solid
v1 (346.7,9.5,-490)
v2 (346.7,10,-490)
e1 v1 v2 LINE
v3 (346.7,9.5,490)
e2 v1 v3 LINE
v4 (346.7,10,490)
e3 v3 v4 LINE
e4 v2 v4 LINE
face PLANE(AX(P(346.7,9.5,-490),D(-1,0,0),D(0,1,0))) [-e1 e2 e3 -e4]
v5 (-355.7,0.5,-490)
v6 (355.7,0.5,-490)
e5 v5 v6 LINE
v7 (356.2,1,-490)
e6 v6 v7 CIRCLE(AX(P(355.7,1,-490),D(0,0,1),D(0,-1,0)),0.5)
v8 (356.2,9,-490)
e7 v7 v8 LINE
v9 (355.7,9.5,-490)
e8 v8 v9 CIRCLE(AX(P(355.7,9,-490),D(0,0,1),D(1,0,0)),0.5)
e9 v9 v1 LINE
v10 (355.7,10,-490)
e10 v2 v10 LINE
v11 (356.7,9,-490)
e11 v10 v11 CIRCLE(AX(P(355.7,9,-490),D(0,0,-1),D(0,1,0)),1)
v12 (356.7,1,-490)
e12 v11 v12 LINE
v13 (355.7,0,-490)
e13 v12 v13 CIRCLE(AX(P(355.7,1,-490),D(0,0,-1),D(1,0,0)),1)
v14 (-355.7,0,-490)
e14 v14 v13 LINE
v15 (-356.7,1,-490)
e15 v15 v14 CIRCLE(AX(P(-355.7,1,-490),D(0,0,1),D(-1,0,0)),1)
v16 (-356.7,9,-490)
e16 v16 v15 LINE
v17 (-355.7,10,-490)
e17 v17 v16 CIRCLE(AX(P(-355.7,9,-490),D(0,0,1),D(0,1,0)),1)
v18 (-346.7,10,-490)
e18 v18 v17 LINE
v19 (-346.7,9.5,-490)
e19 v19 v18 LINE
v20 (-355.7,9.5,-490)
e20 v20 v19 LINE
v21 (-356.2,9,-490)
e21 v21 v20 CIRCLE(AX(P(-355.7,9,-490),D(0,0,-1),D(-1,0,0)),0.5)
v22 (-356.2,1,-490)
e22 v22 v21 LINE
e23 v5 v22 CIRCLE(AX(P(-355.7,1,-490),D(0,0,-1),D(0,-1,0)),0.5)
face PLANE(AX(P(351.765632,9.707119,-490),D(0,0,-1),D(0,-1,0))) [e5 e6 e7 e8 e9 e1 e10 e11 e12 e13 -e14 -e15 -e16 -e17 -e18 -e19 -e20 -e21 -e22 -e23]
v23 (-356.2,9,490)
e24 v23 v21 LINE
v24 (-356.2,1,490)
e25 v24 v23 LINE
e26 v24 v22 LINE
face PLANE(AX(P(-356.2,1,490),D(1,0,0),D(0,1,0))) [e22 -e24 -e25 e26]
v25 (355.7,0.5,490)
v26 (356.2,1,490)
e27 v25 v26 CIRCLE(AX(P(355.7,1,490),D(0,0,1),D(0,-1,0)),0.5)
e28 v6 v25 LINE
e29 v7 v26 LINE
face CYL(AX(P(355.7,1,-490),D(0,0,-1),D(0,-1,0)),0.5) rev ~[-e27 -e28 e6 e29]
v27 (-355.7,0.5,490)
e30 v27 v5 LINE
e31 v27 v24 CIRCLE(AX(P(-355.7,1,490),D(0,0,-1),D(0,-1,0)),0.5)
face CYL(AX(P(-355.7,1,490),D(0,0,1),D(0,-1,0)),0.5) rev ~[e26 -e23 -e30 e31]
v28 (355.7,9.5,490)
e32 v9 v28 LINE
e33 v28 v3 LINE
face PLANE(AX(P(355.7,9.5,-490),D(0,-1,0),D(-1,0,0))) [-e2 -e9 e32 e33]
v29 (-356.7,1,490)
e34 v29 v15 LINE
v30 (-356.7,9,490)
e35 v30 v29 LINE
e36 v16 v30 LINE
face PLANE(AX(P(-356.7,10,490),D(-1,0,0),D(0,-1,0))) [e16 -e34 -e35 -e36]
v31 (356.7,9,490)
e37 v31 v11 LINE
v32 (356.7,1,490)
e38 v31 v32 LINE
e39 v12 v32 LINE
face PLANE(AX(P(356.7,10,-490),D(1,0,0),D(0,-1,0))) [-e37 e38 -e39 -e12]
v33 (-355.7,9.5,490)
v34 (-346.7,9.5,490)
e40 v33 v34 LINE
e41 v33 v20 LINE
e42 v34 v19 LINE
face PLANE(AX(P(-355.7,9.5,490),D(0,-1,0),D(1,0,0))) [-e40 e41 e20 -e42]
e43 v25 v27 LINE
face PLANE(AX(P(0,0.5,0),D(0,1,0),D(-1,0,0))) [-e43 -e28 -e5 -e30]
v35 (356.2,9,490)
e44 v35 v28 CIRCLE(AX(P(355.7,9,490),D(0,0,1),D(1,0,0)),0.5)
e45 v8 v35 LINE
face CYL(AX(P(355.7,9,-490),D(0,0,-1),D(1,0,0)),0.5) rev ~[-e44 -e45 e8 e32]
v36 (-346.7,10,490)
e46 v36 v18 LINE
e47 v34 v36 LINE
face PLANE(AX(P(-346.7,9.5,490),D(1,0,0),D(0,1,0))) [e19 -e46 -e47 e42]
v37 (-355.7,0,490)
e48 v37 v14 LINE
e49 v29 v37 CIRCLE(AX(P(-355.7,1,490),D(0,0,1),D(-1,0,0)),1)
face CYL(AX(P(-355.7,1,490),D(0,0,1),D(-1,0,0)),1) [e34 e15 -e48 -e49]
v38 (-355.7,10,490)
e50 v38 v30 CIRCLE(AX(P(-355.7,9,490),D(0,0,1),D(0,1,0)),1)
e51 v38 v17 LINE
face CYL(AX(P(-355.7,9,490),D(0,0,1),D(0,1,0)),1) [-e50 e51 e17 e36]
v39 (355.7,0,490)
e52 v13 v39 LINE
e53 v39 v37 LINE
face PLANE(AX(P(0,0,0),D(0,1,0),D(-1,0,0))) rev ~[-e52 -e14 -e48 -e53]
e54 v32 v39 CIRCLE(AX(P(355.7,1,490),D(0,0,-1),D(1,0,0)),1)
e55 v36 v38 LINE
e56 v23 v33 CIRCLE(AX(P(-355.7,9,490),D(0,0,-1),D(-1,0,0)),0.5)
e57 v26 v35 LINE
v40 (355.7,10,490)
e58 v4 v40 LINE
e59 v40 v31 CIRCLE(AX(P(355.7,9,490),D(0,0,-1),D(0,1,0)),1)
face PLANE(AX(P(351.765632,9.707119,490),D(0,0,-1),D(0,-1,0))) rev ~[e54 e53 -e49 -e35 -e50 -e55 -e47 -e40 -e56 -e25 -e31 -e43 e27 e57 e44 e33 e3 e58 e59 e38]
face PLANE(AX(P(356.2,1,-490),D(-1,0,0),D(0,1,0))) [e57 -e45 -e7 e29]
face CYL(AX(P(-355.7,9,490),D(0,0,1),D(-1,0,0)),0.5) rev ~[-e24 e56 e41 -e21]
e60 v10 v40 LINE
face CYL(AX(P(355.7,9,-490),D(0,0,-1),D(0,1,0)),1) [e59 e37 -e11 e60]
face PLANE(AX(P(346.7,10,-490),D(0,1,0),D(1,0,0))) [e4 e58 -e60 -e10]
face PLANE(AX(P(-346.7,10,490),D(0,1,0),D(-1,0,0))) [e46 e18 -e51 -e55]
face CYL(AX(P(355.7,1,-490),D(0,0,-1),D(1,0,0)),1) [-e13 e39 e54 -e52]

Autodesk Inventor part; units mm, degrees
ref_plane "YZ Plane" through (0, 0, 0) normal (1, 0, 0) x (0, 1, 0)
ref_plane "XZ Plane" through (0, 0, 0) normal (0, 1, 0) x (-1, 0, 0)
ref_plane "XY Plane" through (0, 0, 0) normal (0, 0, 1) x (1, 0, 0)
sketch "Sketch6" plane through (0, 0, 0) normal (0, 1, 0) x (-1, 0, 0)
  line L0 (356.7, -490) -> (-356.7, -490)
  line L1 (-356.7, -490) -> (-356.7, 490)
  line L2 (-356.7, 490) -> (356.7, 490)
  line L3 (356.7, 490) -> (356.7, -490)
  line L4 (356.7, -490) -> (-356.7, 490) construction
  line L5 (-356.7, -490) -> (356.7, 490) construction
  point P0 (0, 0)
  dimension "d52" = 713.4
  dimension "d53" = 980
extrude "Plate2" add sketch "Sketch6" along normal blind 0.5
sketch "Sketch11" plane through (-356.2, 0, 490) normal (-1, 0, 0) x (0, -1, 0)
  line L0 (0, -980) -> (0, 0)
  line L1 (0, 0) -> (-10, 0)
  line L2 (-10, 0) -> (-10, -980)
  line L3 (-10, -980) -> (0, -980)
edge flange "Flange2" height 10 angle 90 thickness 0.5 bend radius 0.5 thickness toward (-1, 0, 0) relief tear relief width 0.5 relief depth 0.25 edges at (-356.7, 0.5, 0) wall of the first edge with corners at (-356.2, 0, -490) (-356.2, 0, 490) (-356.2, 10, 490) (-356.2, 10, -490)
bend "Bend3"
corner "Corner3"
sketch "Sketch12" plane through (-356.7, 9.5, 490) normal (0, 1, 0) x (-1, 0, 0)
  line L0 (0, -980) -> (0, 0)
  line L1 (0, 0) -> (-10, 0)
  line L2 (-10, 0) -> (-10, -980)
  line L3 (-10, -980) -> (0, -980)
edge flange "Flange3" height 10 angle 90 thickness 0.5 bend radius 0.5 thickness toward (0, 1, 0) relief tear relief width 0.5 relief depth 0.25 edges at (-356.2, 10, 0) wall of the first edge with corners at (-356.7, 9.5, -490) (-356.7, 9.5, 490) (-346.7, 9.5, 490) (-346.7, 9.5, -490)
bend "Bend4"
corner "Corner4"
sketch "Sketch13" plane through (356.2, 0, -490) normal (1, 0, 0) x (0, 1, 0)
  line L0 (0, 980) -> (0, 0)
  line L1 (0, 0) -> (10, 0)
  line L2 (10, 0) -> (10, 980)
  line L3 (10, 980) -> (0, 980)
edge flange "Flange4" height 10 angle 90 thickness 0.5 bend radius 0.5 thickness toward (1, 0, 0) relief tear relief width 0.5 relief depth 0.25 edges at (356.7, 0.5, 0) wall of the first edge with corners at (356.2, 0, 490) (356.2, 0, -490) (356.2, 10, -490) (356.2, 10, 490)
bend "Bend5"
corner "Corner5"
sketch "Sketch14" plane through (356.7, 9.5, -490) normal (0, 1, 0) x (-1, 0, 0)
  line L0 (0, 980) -> (0, 0)
  line L1 (0, 0) -> (10, 0)
  line L2 (10, 0) -> (10, 980)
  line L3 (10, 980) -> (0, 980)
edge flange "Flange5" height 10 angle 90 thickness 0.5 bend radius 0.5 thickness toward (0, 1, 0) relief tear relief width 0.5 relief depth 0.25 edges at (356.2, 10, 0) wall of the first edge with corners at (356.7, 9.5, 490) (356.7, 9.5, -490) (346.7, 9.5, -490) (346.7, 9.5, 490)
bend "Bend6"
corner "Corner6"
equation "\"d52\" = ЖАБРЫ_базовая_ширина - 2 * ЖАБРЫ_шаг_листов"
equation "\"d53\" = ЖАБРЫ_базовая_длина_кор_лист"
equation "\"d54\" = Thickness"
equation "\"d84\" = BendReliefWidth"
equation "\"d85\" = BendReliefDepth"
equation "\"d86\" = MinimumRemnant"
equation "\"d87\" = TransitionRadius"
equation "\"d90\" = BendRadius"
equation "\"d91\" = CornerReliefSize"
equation "\"d92\" = GapSize"
equation "\"d93\" = JacobiRadiusSize"
equation "\"d94\" = BendReliefWidth"
equation "\"d95\" = BendReliefDepth"
equation "\"d96\" = MinimumRemnant"
equation "\"d97\" = TransitionRadius"
equation "\"d100\" = BendRadius"
equation "\"d101\" = CornerReliefSize"
equation "\"d102\" = GapSize"
equation "\"d103\" = JacobiRadiusSize"
equation "\"d104\" = BendReliefWidth"
equation "\"d105\" = BendReliefDepth"
equation "\"d106\" = MinimumRemnant"
equation "\"d107\" = TransitionRadius"
equation "\"d110\" = BendRadius"
equation "\"d111\" = CornerReliefSize"
equation "\"d112\" = GapSize"
equation "\"d113\" = JacobiRadiusSize"
equation "\"d114\" = BendReliefWidth"
equation "\"d115\" = BendReliefDepth"
equation "\"d116\" = MinimumRemnant"
equation "\"d117\" = TransitionRadius"
equation "\"d120\" = BendRadius"
equation "\"d121\" = CornerReliefSize"
equation "\"d122\" = GapSize"
equation "\"d123\" = JacobiRadiusSize"
equation "\"BendRadius\" = Thickness"
equation "\"BendReliefWidth\" = Thickness"
equation "\"BendReliefDepth\" = 0.5 * Thickness"
equation "\"CornerReliefSize\" = 4 * Thickness"
equation "\"MinimumRemnant\" = 2 * Thickness"
equation "\"TransitionRadius\" = BendRadius"
equation "\"JacobiRadiusSize\" = BendRadius"
equation "\"GapSize\" = Thickness"
equation "\"ЖАБРЫ_базовая_ширина\" = 915"
equation "\"ЖАБРЫ_шаг_листов\" = 100.8"
equation "\"ЖАБРЫ_базовая_длина_кор_лист\" = 980"
equation "\"Thickness\" = 0.5"
properties part number "MSC 805 sheet gills" material "Stainless Steel"
